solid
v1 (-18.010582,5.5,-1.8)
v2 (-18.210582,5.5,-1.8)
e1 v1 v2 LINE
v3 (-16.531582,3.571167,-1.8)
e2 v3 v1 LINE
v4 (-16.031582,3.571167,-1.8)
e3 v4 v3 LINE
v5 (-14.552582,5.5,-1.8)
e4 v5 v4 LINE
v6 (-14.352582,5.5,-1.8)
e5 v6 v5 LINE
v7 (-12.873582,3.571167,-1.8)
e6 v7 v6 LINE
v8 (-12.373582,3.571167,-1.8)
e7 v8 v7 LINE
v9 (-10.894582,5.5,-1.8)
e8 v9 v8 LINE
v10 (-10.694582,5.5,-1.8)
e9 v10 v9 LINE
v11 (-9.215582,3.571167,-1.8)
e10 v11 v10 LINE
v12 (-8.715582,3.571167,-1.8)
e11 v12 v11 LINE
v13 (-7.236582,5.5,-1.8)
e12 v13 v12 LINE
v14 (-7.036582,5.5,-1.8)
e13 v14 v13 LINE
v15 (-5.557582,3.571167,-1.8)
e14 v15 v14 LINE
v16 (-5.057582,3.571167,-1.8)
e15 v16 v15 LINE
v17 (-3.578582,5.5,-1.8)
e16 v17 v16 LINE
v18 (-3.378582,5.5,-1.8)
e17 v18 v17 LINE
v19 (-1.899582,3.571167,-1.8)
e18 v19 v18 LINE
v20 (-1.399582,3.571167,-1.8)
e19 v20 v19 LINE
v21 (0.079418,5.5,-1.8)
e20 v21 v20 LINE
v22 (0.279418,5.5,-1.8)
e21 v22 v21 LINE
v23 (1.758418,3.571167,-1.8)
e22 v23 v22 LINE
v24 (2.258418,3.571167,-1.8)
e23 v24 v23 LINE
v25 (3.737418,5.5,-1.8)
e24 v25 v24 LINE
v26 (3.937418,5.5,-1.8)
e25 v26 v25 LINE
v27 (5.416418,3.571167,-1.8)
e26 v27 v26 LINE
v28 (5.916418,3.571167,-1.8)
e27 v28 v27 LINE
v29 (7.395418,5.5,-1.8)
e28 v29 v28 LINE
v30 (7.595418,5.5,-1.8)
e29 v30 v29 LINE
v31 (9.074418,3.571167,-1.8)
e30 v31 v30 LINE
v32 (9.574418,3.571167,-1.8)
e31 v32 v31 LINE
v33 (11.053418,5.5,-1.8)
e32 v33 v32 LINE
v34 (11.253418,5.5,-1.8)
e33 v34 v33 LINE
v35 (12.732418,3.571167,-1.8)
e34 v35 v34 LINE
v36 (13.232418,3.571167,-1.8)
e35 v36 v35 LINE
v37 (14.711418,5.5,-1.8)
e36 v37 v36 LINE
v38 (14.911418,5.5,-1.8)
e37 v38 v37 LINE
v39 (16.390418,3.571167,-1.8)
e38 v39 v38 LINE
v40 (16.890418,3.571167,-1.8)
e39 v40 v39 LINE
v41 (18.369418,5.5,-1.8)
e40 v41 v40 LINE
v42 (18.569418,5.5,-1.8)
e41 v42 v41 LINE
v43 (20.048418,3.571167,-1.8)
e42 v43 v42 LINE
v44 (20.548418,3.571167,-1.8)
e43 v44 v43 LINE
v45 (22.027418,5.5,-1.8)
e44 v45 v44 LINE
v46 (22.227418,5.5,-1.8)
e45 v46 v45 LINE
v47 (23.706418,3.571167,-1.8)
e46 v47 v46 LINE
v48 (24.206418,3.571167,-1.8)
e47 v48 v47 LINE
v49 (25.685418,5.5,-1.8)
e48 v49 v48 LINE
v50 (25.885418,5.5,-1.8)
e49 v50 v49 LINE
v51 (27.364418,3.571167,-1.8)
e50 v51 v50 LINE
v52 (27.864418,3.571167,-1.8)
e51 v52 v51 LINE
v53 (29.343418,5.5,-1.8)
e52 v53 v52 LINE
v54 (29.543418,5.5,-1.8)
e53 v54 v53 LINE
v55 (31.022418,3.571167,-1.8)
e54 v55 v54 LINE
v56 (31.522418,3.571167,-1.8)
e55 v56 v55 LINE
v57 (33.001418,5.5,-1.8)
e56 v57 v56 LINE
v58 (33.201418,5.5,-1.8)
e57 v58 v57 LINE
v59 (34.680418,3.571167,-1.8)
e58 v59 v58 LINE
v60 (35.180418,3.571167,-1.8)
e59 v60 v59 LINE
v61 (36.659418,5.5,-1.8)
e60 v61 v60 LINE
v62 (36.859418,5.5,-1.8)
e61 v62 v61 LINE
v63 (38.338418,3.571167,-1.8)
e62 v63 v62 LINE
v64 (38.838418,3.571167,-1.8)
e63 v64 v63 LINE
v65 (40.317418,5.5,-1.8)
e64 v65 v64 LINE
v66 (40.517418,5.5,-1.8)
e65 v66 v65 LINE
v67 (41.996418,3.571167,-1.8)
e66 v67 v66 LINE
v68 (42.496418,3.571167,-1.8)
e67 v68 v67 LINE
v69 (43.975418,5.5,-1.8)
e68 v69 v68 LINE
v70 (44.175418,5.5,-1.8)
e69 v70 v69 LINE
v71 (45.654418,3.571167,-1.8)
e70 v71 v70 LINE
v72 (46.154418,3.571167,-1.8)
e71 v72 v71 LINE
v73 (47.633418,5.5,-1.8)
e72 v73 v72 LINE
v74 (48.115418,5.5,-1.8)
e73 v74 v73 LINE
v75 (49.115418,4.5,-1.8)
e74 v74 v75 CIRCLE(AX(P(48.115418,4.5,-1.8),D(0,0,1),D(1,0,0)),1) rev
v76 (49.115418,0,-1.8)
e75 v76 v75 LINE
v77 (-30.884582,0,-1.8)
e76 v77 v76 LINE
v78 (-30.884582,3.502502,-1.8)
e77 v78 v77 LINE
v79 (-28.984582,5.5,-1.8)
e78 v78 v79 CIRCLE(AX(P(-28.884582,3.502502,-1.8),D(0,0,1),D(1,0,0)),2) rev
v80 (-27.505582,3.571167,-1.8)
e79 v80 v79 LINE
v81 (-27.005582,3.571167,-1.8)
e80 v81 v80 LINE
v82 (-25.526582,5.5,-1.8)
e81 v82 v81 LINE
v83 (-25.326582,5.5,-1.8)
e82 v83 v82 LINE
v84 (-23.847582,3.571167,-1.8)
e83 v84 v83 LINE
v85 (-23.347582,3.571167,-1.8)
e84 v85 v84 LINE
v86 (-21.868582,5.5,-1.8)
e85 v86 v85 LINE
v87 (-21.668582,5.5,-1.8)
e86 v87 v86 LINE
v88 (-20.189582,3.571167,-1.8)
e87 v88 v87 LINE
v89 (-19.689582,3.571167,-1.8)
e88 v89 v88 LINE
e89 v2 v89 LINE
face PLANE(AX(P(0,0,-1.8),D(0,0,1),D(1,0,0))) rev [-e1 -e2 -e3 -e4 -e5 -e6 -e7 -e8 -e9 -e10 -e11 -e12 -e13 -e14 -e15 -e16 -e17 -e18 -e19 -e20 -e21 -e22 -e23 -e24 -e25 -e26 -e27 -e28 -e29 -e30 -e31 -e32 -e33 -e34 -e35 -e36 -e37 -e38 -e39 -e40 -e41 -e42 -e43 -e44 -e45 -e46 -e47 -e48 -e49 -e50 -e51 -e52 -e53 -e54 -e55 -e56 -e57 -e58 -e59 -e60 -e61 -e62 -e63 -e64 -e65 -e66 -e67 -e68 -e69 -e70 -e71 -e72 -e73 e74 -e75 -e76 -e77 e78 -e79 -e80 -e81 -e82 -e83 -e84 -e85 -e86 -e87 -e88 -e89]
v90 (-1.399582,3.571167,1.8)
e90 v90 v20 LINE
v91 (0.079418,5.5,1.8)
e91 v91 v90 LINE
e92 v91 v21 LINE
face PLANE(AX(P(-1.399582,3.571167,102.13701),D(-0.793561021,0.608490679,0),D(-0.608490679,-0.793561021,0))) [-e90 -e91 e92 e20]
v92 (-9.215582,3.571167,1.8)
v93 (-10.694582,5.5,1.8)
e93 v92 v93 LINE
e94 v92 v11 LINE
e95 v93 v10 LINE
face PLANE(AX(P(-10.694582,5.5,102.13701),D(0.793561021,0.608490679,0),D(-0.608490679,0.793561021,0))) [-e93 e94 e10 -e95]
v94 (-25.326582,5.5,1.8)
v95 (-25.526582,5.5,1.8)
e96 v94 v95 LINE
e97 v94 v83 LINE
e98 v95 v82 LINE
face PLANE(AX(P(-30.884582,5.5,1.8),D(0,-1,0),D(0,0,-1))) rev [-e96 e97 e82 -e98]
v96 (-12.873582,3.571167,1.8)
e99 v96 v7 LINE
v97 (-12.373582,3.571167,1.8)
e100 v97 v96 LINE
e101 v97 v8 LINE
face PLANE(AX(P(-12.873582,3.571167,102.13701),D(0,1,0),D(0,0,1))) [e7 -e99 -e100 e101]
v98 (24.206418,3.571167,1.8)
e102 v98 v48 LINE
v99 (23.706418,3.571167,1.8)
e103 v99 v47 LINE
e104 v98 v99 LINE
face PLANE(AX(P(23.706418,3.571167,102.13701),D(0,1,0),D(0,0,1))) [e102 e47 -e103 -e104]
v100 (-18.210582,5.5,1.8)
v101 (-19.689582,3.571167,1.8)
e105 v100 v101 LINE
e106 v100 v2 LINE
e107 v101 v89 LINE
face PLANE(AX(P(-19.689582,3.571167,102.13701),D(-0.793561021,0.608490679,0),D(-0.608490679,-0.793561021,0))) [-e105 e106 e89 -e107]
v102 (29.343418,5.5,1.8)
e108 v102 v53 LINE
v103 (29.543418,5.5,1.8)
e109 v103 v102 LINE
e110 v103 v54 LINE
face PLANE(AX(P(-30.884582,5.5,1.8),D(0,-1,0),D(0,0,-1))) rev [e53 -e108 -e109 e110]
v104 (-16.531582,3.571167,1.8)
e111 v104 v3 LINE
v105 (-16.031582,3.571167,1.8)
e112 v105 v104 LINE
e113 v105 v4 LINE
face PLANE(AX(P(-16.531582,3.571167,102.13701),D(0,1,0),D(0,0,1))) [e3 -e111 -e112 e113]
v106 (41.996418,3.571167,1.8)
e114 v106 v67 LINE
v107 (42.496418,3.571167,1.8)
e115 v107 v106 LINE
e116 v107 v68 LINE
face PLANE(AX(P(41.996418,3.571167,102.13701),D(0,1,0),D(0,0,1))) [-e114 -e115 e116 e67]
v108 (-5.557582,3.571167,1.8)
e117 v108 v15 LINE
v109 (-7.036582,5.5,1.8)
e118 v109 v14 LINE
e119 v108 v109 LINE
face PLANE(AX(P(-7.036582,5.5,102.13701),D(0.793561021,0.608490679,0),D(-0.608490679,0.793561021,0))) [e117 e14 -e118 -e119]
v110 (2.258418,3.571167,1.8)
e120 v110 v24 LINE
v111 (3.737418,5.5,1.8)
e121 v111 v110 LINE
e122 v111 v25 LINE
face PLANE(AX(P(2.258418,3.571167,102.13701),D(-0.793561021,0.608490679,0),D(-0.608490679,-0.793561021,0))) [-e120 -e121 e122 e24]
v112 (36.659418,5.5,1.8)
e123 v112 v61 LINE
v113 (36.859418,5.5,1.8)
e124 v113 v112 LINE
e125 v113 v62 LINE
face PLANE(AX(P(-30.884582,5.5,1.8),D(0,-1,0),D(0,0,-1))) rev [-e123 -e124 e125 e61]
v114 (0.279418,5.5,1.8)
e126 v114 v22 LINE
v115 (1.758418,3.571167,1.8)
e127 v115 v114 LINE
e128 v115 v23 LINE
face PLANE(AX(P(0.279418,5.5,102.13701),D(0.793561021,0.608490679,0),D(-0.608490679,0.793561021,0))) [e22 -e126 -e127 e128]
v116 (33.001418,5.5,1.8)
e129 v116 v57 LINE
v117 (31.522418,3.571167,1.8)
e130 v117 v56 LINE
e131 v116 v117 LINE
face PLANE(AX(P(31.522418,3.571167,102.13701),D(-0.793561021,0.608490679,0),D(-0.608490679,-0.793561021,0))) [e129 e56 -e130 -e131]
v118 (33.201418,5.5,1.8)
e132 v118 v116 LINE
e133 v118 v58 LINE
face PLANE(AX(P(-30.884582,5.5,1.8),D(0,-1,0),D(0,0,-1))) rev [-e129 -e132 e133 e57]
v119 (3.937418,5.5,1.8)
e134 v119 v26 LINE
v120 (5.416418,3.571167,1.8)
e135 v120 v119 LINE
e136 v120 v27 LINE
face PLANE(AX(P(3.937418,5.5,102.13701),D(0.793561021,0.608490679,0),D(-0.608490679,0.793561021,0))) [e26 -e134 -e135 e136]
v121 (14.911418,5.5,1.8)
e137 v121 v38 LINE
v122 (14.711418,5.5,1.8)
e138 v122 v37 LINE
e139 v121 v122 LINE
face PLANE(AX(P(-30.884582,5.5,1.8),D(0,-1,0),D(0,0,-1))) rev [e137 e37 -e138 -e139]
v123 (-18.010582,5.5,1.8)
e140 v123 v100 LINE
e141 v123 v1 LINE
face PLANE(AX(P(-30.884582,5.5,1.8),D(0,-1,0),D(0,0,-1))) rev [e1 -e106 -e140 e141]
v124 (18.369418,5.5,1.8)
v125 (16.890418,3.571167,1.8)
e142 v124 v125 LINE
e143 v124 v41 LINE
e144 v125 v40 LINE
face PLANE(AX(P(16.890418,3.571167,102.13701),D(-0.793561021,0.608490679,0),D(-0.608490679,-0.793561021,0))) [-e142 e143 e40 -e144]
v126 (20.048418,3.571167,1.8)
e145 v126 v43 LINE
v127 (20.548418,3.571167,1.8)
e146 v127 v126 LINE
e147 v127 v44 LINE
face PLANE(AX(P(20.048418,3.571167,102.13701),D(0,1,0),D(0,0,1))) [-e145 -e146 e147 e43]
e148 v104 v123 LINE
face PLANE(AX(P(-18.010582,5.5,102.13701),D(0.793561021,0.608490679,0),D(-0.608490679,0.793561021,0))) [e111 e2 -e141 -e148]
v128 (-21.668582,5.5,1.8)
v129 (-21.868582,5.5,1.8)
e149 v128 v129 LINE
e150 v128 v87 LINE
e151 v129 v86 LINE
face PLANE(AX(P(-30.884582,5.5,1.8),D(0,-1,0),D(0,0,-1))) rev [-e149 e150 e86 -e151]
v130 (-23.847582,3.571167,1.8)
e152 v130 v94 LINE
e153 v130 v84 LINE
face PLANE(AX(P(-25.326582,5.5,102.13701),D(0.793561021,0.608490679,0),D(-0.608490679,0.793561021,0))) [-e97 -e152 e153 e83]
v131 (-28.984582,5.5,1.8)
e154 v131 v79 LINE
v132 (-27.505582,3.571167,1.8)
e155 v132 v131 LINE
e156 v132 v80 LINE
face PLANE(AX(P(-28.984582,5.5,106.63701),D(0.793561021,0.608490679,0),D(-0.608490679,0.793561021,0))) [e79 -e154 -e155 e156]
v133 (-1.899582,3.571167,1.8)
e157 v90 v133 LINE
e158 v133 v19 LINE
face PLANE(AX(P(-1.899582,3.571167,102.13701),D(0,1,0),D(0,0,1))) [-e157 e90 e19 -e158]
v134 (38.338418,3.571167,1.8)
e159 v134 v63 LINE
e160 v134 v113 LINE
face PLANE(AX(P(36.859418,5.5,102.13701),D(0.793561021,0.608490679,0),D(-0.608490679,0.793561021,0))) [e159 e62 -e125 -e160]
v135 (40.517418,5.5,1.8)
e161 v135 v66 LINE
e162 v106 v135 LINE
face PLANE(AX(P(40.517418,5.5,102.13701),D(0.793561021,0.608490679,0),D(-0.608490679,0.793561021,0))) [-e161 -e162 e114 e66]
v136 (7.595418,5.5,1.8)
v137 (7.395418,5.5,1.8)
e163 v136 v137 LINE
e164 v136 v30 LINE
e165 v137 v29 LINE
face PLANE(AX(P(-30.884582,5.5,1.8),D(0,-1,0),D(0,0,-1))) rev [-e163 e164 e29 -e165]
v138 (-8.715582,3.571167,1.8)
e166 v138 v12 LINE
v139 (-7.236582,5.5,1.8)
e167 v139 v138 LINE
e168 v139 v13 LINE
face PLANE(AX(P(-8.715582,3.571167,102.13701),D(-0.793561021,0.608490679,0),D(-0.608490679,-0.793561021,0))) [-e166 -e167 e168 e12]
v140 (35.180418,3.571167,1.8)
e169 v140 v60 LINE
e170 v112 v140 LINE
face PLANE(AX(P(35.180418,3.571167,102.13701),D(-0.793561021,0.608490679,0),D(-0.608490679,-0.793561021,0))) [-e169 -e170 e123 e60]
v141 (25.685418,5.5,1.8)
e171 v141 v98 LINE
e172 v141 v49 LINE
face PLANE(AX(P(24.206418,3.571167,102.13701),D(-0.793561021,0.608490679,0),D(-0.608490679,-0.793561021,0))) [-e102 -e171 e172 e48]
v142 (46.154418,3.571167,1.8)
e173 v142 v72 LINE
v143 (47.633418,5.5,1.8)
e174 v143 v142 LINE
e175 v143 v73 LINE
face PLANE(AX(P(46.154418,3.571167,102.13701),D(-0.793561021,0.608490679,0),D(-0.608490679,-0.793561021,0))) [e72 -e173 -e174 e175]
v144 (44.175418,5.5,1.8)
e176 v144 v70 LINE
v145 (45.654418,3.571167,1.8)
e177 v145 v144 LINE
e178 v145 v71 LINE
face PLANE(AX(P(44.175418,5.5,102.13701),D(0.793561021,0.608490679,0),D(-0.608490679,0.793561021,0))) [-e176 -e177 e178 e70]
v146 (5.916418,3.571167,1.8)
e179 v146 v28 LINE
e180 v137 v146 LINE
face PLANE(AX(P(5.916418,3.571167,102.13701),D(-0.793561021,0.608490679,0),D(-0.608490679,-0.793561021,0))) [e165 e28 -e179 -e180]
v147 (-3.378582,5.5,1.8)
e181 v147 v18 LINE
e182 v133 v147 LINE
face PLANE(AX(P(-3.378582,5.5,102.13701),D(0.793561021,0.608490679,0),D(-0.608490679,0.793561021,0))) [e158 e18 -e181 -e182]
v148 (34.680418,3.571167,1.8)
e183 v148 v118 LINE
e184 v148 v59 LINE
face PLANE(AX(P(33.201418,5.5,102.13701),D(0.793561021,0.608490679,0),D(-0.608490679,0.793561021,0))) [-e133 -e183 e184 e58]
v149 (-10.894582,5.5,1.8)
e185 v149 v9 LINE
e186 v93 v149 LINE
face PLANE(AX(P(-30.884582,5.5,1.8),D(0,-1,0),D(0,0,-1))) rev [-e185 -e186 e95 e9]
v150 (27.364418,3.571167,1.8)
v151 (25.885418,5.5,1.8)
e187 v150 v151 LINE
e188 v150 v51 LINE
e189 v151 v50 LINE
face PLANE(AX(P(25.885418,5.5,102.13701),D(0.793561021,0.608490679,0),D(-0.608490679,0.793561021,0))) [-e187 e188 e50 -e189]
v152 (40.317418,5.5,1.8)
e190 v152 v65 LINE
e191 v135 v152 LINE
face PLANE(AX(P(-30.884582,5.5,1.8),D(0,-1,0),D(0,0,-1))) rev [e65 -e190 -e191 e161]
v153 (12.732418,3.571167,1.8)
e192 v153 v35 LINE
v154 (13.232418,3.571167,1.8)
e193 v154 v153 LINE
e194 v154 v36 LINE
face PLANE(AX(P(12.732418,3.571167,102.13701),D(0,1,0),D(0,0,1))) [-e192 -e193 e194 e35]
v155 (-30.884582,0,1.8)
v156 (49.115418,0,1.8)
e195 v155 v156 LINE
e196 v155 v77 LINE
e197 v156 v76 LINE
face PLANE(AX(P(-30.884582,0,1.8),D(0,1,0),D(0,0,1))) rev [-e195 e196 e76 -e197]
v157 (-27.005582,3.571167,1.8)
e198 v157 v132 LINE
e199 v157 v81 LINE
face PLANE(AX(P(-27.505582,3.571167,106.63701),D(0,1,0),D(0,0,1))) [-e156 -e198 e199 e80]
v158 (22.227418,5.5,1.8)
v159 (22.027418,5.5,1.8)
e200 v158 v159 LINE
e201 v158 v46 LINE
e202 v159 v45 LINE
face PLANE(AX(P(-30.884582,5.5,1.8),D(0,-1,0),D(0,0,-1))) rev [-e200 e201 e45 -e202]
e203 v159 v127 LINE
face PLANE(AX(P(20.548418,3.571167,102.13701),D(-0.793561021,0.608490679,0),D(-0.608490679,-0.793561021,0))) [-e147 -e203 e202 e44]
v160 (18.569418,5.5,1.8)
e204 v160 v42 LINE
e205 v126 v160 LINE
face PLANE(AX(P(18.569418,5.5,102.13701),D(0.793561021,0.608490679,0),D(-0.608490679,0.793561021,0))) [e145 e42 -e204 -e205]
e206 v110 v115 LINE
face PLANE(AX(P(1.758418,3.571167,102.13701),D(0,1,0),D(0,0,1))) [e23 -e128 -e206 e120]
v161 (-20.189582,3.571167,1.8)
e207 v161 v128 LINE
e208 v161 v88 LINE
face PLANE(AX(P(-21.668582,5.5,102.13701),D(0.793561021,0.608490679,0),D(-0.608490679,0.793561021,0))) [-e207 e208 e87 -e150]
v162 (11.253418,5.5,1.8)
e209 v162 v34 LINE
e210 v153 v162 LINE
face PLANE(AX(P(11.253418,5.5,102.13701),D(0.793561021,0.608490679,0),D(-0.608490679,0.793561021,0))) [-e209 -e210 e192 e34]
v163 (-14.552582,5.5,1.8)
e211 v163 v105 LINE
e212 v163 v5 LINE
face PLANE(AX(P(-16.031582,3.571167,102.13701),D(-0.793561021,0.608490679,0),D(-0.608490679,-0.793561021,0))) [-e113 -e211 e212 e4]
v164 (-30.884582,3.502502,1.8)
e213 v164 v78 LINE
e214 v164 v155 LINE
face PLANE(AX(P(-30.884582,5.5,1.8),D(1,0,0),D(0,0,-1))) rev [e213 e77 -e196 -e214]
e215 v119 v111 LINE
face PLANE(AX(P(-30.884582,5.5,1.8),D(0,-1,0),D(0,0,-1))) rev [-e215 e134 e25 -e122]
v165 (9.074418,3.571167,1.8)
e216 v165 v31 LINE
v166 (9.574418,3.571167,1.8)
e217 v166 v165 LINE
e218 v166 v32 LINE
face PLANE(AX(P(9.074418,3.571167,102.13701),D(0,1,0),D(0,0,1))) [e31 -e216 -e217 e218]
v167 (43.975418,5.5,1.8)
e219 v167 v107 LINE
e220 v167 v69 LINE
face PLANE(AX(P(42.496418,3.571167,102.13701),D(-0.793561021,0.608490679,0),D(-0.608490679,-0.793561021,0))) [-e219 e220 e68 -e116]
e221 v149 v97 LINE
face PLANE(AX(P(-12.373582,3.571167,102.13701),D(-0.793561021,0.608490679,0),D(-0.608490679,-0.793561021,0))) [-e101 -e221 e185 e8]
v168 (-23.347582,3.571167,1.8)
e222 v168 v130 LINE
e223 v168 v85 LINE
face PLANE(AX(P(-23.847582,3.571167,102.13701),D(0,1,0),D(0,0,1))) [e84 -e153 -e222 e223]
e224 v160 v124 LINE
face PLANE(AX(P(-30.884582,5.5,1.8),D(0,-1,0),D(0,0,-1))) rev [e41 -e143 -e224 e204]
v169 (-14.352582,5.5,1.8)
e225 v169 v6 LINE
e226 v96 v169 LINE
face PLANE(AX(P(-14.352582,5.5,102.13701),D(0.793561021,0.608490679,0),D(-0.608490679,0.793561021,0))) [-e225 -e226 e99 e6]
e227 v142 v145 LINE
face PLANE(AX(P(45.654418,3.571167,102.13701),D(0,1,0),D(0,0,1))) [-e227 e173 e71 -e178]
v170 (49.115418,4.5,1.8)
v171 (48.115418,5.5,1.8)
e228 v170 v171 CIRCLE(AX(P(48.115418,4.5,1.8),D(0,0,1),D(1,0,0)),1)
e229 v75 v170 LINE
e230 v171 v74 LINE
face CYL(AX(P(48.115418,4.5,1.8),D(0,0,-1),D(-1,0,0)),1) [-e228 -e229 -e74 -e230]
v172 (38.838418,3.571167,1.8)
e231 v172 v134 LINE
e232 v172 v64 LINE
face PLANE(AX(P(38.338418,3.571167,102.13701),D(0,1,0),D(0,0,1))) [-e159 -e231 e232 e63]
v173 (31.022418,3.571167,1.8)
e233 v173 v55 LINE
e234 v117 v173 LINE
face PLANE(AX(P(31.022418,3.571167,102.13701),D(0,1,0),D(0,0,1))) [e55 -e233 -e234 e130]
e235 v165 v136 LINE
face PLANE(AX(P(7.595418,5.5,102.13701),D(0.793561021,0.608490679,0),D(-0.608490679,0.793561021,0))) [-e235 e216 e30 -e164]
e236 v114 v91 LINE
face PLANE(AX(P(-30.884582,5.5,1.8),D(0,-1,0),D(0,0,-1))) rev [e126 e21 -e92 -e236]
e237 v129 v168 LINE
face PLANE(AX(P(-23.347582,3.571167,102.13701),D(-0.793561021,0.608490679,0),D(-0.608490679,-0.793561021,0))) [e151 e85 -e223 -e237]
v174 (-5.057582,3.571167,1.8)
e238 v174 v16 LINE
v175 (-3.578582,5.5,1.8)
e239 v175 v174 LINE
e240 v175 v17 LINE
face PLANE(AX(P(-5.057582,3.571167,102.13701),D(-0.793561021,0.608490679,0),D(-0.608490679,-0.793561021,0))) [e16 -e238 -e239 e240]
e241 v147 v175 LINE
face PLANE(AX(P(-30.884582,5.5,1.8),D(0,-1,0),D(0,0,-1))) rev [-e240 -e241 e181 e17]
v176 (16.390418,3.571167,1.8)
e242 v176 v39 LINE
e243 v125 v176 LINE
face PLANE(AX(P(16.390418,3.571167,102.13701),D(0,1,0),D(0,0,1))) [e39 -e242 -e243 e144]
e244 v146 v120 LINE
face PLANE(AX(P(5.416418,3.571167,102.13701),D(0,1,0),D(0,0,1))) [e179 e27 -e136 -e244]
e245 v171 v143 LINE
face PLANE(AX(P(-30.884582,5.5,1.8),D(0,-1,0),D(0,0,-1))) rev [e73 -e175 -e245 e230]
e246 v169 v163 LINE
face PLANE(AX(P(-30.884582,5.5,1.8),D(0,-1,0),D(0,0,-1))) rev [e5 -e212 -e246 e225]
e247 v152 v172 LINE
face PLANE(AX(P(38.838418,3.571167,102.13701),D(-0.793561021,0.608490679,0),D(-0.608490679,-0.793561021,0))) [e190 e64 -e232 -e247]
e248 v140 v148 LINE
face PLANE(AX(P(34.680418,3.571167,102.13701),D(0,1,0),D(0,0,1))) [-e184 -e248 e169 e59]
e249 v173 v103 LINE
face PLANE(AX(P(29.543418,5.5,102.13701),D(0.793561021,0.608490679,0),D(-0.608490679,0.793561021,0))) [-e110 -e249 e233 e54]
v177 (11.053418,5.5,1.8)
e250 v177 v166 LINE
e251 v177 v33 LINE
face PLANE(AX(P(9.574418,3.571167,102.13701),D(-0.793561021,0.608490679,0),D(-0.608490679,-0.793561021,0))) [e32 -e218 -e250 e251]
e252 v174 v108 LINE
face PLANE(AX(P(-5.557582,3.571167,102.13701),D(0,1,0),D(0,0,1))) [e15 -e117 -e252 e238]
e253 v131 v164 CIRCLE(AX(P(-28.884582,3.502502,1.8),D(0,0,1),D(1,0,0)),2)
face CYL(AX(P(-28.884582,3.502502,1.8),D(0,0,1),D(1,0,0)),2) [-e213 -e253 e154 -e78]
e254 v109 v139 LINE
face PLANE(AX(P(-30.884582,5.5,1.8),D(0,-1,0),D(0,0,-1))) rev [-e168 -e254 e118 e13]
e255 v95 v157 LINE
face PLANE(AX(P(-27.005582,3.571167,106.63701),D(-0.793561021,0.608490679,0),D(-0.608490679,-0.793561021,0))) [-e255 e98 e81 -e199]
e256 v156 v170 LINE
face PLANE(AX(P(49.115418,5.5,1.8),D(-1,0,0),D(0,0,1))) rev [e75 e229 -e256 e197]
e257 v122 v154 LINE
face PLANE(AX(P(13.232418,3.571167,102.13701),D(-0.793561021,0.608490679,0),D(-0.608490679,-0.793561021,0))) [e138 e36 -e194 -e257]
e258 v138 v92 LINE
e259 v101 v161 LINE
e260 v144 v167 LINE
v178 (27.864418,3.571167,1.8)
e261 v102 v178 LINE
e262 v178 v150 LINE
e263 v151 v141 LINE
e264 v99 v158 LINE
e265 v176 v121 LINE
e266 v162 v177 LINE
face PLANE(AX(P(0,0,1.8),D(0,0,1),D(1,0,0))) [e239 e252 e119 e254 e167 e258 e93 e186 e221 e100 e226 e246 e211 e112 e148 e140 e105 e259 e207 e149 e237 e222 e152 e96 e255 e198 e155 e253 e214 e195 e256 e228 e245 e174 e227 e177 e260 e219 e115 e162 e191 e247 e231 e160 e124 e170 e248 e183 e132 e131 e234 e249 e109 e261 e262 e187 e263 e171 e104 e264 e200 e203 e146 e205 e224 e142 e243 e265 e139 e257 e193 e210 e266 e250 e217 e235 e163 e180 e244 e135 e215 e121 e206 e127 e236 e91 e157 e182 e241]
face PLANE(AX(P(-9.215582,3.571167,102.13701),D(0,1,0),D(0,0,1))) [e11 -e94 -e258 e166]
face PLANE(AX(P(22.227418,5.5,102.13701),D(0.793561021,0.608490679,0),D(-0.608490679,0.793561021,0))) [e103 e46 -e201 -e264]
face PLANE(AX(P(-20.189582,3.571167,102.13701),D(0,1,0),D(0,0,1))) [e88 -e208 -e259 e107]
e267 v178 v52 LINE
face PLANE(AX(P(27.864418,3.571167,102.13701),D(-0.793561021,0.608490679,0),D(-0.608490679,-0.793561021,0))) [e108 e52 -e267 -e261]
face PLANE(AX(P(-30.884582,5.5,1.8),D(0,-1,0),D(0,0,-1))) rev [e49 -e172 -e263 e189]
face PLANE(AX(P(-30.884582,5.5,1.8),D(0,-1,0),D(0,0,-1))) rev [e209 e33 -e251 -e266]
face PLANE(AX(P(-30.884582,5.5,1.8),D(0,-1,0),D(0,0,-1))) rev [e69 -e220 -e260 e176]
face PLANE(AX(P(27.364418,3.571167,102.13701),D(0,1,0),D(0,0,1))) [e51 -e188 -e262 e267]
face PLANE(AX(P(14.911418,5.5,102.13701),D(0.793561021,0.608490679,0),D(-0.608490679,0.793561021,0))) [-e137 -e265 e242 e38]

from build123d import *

# Parameters (mm, degrees)
SKIZZE1_W                       = 80
SKIZZE1_H                       = 5.5
KOERPER_DEPTH                   = 1.8
SCHNITT_LINEAR_AUSTRAGEN1_DEPTH = 50.553348274
LINEARES_MUSTER10_COUNT         = 21
LINEARES_MUSTER10_PITCH         = 3.658
VERRUNDUNG1_R                   = 2
VERRUNDUNG2_R                   = 1


with BuildPart() as part:
    # Skizze1 → Koerper (new, symmetric)
    with BuildSketch(Plane.XY):
        with Locations((9.115418405, 2.75)):
            Rectangle(SKIZZE1_W, SKIZZE1_H)
    extrude(amount=KOERPER_DEPTH, both=True)

    # kerbe → Schnitt-Linear austragen1 (cut, symmetric)
    with BuildSketch(Plane.XY.offset(1.8)):
        Polygon((-195.870933041, 5.5), (-29.084581595, 5.5), (-28.984581595, 5.5), (-27.505581595, 3.57116725), (-27.005581595, 3.57116725), (-25.526581595, 5.5), (-25.426581595, 5.5), (141.359769852, 5.5), (141.359769852, 339.072702894), (-195.870933041, 339.072702894), align=None)
    schnitt_linear_austragen1 = extrude(amount=SCHNITT_LINEAR_AUSTRAGEN1_DEPTH, both=True, mode=Mode.SUBTRACT)

    # Lineares Muster10: Schnitt-Linear austragen1 ×21
    with Locations(*[(i * LINEARES_MUSTER10_PITCH, 0, 0) for i in range(1, LINEARES_MUSTER10_COUNT)]):
        add(schnitt_linear_austragen1, mode=Mode.SUBTRACT)

    # Verrundung1
    # the kernel refuses this fillet: 2 mm, written as the material it takes off along each edge
    with BuildSketch(Plane(origin=(-30.884581595, 5.5, -6.793746089), x_dir=(1, 0, 0), z_dir=(0, 0, 1))) as verrundung1_piece_1:
        with BuildLine():
            CenterArc((2, -1.997498436), VERRUNDUNG1_R, 92.865983983, 87.134016017)
            Line((0, -1.997498436), (-0.04, -1.997498436))
            Line((-0.04, -1.997498436), (-0.04, 0))
            Line((-0.04, 0), (0, 0.04))
            ThreePointArc((0, 0.04), (0.95, 0.04), (1.898, 0.039949969))
            Line((1.898, 0.039949969), (1.9, 0))
        make_face()
    extrude(amount=13.587492178, mode=Mode.SUBTRACT)

    # Verrundung2
    verrundung2_edges = [part.edges().sort_by_distance(p)[0] for p in [
        (49.115418405, 5.5, 0),
    ]]
    fillet(verrundung2_edges, radius=VERRUNDUNG2_R)


solid = part.part
